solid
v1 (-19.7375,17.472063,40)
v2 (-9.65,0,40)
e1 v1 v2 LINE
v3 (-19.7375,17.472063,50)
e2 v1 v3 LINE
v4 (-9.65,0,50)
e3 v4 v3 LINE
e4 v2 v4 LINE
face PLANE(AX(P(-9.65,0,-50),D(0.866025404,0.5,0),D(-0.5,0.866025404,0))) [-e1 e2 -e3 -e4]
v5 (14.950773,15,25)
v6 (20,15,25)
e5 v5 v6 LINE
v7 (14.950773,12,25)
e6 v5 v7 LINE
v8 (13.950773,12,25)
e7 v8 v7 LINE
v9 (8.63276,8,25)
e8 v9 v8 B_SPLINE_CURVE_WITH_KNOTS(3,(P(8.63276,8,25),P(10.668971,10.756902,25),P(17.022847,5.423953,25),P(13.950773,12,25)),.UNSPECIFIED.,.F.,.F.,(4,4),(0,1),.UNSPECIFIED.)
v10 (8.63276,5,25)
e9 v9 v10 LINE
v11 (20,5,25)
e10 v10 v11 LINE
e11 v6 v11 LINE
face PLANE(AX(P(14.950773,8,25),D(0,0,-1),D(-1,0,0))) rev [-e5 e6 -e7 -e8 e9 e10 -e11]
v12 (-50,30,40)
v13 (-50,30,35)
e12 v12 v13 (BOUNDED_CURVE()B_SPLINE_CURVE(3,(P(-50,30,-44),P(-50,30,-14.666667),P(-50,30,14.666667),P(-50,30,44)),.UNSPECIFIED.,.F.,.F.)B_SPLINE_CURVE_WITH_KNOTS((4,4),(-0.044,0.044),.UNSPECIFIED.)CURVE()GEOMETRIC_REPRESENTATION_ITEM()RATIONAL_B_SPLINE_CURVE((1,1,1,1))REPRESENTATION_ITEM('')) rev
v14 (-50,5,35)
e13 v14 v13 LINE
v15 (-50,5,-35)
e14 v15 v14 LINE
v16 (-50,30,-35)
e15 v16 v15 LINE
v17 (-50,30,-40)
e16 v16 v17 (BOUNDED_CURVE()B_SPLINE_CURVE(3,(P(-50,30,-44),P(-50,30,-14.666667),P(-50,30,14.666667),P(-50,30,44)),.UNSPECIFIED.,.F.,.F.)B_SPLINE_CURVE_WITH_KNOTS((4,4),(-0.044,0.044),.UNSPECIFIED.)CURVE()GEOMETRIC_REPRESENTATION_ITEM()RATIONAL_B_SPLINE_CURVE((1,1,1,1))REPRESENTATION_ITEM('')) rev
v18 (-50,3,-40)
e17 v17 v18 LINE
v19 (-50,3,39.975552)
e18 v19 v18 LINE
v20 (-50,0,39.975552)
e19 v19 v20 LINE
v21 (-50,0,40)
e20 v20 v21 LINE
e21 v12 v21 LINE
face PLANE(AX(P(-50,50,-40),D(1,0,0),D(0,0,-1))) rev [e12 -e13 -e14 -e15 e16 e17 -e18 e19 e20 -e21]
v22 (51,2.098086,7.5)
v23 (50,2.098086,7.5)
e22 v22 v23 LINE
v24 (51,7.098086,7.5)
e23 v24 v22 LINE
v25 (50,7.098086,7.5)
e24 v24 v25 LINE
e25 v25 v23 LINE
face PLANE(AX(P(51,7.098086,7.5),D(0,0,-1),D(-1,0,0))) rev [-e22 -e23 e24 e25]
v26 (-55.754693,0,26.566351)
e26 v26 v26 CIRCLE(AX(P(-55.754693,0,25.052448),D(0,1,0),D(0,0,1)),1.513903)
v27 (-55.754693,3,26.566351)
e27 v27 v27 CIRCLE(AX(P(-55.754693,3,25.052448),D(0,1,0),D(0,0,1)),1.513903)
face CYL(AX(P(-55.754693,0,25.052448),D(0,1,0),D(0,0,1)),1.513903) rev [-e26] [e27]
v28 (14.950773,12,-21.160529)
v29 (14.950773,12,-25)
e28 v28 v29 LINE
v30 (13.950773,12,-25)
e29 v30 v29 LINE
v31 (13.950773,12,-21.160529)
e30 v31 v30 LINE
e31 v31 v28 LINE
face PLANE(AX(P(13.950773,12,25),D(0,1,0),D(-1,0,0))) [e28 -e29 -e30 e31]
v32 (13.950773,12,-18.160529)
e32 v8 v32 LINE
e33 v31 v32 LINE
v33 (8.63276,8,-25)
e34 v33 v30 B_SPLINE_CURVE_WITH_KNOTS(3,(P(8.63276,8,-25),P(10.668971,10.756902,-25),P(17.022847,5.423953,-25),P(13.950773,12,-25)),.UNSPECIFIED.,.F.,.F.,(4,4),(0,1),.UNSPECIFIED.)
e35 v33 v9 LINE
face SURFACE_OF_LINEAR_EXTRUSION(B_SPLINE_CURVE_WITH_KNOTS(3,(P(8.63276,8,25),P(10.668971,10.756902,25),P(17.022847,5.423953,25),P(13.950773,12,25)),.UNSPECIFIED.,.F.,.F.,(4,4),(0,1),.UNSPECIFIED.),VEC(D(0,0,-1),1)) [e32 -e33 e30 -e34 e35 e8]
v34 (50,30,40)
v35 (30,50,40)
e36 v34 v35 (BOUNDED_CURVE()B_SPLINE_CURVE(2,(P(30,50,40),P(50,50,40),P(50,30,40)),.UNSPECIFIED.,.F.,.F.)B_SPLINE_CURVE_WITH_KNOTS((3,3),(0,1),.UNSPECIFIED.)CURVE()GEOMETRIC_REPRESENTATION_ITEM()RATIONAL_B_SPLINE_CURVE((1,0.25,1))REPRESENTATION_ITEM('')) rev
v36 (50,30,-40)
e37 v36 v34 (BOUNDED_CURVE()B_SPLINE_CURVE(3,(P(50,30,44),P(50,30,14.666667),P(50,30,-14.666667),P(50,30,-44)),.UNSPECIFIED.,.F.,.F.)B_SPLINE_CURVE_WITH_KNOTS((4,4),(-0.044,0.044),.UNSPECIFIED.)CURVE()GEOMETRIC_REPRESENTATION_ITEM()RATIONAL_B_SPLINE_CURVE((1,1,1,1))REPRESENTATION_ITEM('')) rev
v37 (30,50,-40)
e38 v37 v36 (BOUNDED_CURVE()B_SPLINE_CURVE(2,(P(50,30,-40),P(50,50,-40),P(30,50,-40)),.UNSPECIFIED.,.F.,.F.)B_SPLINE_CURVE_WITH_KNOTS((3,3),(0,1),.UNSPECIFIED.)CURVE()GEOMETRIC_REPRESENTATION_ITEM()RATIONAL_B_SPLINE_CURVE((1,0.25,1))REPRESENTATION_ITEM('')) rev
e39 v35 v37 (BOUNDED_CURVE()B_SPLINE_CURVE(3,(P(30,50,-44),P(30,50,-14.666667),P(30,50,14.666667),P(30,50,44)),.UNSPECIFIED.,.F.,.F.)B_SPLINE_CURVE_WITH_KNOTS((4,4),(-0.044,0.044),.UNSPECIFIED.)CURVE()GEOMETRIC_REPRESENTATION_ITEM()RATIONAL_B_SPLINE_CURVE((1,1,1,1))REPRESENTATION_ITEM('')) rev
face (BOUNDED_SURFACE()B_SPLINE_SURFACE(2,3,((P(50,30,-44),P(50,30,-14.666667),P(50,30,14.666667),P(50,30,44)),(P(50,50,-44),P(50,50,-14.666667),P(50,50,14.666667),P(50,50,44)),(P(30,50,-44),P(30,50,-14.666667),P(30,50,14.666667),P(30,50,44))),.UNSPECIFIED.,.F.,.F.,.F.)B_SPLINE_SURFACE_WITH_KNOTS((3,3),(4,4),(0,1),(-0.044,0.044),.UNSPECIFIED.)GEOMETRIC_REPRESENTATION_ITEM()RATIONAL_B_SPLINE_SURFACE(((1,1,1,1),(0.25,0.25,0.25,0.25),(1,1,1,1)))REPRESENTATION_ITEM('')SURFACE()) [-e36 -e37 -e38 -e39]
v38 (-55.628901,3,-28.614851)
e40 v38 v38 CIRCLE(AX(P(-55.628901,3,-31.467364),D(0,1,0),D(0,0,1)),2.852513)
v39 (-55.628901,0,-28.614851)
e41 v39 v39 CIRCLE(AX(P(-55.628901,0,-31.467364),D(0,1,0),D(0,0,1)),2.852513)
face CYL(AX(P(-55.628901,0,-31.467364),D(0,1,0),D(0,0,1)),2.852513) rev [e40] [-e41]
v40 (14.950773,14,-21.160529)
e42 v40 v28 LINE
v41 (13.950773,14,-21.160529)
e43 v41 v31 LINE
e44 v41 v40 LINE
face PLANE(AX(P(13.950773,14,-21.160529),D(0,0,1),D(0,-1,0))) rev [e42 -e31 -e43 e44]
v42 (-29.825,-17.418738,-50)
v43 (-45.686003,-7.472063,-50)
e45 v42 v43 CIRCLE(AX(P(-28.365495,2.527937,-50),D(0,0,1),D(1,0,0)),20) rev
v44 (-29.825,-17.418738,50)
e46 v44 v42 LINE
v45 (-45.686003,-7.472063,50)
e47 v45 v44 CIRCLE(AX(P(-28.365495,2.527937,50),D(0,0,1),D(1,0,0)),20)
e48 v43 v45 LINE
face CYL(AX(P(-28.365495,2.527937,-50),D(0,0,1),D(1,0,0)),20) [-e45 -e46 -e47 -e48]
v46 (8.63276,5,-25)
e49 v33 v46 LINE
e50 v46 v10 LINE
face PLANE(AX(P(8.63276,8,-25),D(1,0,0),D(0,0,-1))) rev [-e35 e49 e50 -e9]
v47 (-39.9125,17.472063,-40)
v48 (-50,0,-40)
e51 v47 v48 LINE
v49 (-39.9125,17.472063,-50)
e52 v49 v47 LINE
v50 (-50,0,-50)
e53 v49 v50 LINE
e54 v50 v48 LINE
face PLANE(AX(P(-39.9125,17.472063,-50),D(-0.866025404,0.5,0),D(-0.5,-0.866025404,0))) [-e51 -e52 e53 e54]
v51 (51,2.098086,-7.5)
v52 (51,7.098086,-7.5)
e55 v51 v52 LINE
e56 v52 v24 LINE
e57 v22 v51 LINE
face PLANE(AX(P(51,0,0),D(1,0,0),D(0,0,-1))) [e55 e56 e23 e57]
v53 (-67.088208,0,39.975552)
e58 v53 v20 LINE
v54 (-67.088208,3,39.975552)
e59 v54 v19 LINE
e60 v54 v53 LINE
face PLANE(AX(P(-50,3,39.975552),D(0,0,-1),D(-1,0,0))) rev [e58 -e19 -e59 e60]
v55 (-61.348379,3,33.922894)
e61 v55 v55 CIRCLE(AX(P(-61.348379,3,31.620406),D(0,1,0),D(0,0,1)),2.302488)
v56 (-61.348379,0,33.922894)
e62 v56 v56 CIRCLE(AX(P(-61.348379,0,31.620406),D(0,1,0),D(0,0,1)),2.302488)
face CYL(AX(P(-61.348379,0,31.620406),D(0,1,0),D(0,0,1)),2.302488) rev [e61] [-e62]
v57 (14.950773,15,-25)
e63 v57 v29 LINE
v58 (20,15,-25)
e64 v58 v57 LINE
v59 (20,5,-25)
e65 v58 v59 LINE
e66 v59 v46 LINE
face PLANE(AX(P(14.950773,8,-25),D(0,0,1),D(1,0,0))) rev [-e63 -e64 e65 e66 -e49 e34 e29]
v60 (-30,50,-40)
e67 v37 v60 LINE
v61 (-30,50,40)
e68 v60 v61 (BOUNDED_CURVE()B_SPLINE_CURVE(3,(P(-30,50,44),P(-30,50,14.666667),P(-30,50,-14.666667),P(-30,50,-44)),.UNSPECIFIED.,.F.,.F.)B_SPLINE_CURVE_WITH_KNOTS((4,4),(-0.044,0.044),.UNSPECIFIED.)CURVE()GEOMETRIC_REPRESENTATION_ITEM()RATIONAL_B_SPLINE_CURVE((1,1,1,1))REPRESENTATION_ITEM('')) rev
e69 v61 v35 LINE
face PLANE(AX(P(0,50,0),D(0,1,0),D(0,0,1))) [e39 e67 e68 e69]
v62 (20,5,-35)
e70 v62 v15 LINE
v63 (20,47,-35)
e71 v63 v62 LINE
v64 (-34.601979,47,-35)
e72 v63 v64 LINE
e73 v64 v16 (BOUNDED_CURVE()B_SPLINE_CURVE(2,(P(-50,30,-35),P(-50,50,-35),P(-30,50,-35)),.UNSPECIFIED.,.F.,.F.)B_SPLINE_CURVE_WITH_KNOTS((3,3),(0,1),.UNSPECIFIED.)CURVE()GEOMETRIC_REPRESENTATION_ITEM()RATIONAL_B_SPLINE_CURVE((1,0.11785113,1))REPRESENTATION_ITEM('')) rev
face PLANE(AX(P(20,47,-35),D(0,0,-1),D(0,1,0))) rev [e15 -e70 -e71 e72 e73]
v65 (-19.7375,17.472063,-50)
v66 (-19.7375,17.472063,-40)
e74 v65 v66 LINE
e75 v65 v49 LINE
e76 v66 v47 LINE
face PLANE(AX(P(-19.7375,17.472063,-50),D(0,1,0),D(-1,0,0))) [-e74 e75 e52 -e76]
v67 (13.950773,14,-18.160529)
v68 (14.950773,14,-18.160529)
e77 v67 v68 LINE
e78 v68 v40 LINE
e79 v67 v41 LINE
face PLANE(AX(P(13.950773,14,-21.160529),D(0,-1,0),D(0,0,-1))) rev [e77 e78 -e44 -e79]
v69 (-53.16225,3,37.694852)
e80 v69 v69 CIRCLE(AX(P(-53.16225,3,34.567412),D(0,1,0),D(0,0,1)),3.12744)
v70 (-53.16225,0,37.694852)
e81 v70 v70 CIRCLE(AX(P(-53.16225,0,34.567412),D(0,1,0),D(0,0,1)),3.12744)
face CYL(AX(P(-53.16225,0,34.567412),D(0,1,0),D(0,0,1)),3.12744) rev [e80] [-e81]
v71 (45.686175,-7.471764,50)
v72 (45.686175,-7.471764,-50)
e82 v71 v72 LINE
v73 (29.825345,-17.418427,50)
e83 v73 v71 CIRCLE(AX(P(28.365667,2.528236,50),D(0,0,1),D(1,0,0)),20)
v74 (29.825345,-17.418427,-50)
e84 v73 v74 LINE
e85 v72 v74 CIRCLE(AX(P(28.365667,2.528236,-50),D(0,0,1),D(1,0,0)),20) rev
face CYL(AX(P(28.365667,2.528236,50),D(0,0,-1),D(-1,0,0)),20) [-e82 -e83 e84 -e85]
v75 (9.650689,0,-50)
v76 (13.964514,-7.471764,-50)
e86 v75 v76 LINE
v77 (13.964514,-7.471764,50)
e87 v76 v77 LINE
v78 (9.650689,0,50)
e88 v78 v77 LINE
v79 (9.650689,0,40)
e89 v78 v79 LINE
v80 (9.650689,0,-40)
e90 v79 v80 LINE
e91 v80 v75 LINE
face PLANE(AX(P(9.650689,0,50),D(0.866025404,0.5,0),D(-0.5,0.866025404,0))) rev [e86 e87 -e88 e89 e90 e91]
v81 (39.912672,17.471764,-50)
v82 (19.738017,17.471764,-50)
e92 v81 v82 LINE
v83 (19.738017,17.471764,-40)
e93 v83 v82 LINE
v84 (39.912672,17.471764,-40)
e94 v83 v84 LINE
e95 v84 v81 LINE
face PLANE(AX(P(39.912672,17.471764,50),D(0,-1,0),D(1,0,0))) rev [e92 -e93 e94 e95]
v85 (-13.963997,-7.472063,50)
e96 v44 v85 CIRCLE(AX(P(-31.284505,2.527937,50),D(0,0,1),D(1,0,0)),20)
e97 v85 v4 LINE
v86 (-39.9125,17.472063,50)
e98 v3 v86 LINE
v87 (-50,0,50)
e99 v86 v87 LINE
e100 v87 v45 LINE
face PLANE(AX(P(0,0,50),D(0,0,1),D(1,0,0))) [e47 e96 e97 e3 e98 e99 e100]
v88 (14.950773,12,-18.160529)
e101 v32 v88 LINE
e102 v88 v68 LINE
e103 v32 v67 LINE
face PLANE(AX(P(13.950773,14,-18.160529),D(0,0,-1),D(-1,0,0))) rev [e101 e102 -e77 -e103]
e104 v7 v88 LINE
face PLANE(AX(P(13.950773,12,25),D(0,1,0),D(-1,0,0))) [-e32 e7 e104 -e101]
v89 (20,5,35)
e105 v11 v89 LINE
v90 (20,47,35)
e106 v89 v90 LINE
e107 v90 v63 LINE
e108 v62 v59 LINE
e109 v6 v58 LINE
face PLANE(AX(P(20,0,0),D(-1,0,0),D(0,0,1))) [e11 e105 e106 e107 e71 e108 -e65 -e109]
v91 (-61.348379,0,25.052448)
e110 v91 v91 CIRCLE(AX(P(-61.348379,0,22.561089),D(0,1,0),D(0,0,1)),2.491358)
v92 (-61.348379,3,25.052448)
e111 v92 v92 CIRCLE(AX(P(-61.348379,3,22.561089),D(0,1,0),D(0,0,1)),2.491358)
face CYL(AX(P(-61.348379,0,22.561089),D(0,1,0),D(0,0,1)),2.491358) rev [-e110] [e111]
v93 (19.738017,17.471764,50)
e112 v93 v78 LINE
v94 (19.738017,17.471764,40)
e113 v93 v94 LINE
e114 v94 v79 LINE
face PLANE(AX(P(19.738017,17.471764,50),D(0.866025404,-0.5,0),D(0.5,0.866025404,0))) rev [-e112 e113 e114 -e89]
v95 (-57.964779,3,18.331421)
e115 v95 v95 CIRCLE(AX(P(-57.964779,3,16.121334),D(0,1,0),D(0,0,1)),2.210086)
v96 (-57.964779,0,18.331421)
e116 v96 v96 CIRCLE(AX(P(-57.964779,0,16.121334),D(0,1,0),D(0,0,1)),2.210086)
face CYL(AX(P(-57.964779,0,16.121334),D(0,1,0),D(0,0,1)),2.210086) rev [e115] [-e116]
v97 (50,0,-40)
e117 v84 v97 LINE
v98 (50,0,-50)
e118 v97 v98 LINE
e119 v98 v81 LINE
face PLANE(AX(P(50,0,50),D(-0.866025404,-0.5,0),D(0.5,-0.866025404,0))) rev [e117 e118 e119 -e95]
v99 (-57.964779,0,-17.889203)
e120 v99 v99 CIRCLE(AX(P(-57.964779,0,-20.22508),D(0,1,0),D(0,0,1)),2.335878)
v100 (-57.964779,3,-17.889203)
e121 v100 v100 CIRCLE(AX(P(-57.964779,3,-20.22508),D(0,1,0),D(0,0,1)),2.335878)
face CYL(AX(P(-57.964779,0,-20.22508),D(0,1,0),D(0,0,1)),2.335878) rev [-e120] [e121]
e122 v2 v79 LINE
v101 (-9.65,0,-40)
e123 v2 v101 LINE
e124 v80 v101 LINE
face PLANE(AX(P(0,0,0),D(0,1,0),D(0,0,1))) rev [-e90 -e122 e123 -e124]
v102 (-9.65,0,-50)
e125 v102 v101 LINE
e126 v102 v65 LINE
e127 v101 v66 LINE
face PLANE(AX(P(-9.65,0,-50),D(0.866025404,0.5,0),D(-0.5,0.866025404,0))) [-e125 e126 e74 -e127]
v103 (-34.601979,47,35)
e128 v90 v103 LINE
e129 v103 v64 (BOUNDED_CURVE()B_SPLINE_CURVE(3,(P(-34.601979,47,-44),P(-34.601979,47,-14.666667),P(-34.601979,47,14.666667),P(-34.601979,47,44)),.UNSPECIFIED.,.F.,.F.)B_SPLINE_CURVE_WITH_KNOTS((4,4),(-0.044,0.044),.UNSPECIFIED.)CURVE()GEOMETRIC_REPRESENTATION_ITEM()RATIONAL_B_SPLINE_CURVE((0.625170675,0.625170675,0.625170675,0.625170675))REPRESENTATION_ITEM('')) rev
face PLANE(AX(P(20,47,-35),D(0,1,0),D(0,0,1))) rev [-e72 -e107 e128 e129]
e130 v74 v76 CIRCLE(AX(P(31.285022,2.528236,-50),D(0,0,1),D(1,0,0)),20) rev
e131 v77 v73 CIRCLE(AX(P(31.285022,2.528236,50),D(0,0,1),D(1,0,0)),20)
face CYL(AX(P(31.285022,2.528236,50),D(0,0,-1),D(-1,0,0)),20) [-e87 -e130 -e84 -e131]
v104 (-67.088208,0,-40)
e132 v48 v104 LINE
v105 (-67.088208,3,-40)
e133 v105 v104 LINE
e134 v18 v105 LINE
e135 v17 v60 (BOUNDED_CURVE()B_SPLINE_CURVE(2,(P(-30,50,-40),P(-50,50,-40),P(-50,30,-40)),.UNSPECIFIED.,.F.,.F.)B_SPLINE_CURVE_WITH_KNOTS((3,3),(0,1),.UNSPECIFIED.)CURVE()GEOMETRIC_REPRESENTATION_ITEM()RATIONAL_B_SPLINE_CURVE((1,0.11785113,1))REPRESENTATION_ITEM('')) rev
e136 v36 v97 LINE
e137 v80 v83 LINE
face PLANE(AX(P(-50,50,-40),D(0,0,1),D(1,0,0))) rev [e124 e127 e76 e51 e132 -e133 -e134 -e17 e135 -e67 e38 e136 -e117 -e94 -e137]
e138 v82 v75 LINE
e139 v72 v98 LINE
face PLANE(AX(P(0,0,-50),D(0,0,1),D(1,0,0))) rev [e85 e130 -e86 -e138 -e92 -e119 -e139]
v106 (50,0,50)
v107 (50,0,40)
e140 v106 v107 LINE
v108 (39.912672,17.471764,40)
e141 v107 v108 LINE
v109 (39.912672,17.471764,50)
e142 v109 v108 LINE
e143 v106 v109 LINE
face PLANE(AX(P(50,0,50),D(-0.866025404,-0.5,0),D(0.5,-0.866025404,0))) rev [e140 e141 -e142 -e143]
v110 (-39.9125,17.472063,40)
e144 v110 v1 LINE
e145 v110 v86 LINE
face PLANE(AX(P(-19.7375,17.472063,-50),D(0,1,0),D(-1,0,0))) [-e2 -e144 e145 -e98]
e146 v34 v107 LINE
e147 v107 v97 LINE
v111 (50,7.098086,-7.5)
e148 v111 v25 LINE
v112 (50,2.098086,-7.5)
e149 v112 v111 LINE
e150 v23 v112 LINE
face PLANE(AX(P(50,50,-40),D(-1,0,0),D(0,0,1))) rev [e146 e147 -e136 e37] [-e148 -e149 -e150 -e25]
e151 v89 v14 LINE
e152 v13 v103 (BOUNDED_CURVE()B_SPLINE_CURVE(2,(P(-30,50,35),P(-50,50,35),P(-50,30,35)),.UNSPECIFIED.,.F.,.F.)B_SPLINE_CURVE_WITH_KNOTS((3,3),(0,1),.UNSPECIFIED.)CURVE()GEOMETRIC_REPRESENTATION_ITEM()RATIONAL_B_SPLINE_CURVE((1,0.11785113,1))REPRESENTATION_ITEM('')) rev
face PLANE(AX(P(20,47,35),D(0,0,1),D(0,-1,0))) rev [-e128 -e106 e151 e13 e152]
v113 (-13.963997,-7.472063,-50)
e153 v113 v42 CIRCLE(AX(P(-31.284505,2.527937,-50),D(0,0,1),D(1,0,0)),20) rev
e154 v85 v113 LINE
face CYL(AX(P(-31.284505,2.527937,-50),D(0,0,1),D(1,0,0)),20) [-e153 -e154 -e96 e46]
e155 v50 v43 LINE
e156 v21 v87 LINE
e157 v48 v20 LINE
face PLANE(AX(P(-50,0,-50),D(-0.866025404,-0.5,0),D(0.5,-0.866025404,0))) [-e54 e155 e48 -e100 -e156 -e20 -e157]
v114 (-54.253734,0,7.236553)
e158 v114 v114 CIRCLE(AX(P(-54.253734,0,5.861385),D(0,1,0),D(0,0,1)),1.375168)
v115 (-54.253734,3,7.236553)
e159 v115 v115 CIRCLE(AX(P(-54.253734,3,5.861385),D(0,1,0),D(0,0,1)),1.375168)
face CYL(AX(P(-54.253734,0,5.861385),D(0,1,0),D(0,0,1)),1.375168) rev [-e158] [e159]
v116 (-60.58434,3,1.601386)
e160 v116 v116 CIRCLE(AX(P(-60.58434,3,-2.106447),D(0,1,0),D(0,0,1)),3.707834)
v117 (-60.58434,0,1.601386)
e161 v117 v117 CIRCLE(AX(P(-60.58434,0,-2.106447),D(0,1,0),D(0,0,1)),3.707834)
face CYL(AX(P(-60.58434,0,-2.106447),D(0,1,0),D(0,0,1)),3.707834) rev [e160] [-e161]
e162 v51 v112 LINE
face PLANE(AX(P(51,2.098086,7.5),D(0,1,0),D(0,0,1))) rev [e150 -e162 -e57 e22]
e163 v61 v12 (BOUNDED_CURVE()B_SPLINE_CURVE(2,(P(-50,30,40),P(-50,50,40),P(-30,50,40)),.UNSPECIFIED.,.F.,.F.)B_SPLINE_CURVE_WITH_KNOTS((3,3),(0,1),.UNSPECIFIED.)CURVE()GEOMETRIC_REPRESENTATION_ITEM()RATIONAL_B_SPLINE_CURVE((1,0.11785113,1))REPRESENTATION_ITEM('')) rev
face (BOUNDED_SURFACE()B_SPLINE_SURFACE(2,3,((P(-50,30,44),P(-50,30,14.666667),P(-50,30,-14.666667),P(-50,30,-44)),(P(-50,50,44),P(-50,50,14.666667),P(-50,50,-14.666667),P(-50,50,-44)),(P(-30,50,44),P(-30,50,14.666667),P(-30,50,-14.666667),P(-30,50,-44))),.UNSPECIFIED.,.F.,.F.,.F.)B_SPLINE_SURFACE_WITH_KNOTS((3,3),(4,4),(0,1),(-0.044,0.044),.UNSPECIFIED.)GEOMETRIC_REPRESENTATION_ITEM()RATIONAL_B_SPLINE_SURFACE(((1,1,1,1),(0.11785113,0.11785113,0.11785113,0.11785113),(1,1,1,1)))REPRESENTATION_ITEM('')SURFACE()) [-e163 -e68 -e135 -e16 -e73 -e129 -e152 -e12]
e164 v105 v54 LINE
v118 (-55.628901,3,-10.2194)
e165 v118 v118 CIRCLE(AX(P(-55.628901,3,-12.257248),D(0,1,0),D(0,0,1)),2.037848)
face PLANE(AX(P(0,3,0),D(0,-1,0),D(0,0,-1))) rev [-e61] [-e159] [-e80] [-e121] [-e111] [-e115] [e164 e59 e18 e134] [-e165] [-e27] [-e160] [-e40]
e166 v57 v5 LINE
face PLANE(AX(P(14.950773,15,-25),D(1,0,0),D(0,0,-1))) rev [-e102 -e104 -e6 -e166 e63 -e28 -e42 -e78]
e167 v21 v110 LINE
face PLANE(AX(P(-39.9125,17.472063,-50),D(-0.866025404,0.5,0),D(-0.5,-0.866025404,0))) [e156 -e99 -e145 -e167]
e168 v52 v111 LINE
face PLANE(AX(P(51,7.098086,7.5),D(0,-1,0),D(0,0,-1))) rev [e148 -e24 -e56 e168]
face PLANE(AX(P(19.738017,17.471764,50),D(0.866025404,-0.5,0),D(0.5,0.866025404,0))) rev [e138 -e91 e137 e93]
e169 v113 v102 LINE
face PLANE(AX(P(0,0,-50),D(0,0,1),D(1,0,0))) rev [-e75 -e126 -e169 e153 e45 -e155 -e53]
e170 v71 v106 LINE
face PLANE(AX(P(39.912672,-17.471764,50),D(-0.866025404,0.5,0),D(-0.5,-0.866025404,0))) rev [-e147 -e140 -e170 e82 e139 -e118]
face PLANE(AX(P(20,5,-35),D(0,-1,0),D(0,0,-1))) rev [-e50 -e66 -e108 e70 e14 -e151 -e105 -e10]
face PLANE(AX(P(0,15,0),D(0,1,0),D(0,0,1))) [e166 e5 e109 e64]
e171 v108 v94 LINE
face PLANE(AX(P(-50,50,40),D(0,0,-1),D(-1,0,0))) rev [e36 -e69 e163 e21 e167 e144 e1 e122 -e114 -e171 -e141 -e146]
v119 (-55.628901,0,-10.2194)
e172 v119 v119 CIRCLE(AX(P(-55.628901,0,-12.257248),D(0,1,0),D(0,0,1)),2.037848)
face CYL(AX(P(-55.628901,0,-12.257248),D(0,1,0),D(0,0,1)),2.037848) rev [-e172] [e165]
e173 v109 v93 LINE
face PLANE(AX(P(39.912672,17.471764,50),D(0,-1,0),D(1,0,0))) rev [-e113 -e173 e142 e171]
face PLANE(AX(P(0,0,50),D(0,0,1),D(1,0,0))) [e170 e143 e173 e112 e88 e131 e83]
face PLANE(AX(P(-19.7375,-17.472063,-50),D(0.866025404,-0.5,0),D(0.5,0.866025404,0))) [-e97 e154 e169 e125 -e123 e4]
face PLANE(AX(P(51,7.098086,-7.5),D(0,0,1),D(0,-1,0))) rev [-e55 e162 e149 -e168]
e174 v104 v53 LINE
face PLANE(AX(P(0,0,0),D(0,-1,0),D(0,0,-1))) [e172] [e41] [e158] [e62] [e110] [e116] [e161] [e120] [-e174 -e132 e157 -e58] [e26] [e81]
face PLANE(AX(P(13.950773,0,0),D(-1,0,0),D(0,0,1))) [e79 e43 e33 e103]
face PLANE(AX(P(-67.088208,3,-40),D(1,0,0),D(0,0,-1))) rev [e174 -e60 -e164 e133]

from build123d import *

# Parameters (mm, degrees)
SKETCH_1_W           = 100
SKETCH_1_H           = 80
EXTRUDE_1_DEPTH      = 50
EXTRUDE_3_DEPTH      = 10
EXTRUDE_3_DEPTH_BACK = 90
FILLET_1_SIZE        = 20
FILLET_2_R           = 20
SKETCH_7_W           = 15
SKETCH_7_H           = 5
EXTRUDE_4_DEPTH      = 1
EXTRUDE_5_DEPTH      = 10
EXTRUDE_5_DEPTH_BACK = 90
SKETCH_9_W           = 70
SKETCH_9_H           = 42
CUT_EXTRUDE_1_DEPTH  = 70
SKETCH_10_W          = 6.318012245
SKETCH_10_H          = 50
EXTRUDE_6_DEPTH      = 3
SKETCH_11_W          = 5.049227312
SKETCH_11_H          = 50
EXTRUDE_7_DEPTH      = 10
SKETCH_12_W          = 3
SKETCH_12_H          = 2
EXTRUDE_8_DEPTH      = 1
SKETCH_14_W          = 17.088208375
SKETCH_14_H          = 79.975552451
EXTRUDE_9_DEPTH      = 3
SKETCH_15_R          = 3.127439505
SKETCH_15_R_2        = 2.491358357
SKETCH_15_R_3        = 2.210086479
SKETCH_15_R_4        = 1.513903484
SKETCH_15_R_5        = 2.302487837
SKETCH_15_R_6        = 3.707833668
SKETCH_15_R_7        = 2.33587758
SKETCH_15_R_8        = 2.037847665
SKETCH_15_R_9        = 1.375167725
SKETCH_15_R_10       = 2.852513386
CUT_EXTRUDE_2_DEPTH  = 3
FILLET_7_SIZE        = 20
FILLET_8_R           = 20
EXTRUDE_10_DEPTH     = 50


with BuildPart() as part:
    # 草圖1 → 填料-伸長1 (new body)
    with BuildSketch(Plane(origin=(0, 0, 0), x_dir=(1, 0, 0), z_dir=(0, 1, 0))):
        Rectangle(SKETCH_1_W, SKETCH_1_H)
    extrude(amount=EXTRUDE_1_DEPTH)

    # 草圖4 → 填料-伸長3 (add, two sides: drawn at the far end of the back side and taken through both)
    with BuildSketch(Plane.XY.offset(40).offset(-EXTRUDE_3_DEPTH_BACK)):
        Polygon((50, 0), (39.912672295, 17.471764098), (19.738016884, 17.471764098), (9.650689179, 0), (19.738016884, -17.471764098), (39.912672295, -17.471764098), align=None)
    extrude(amount=EXTRUDE_3_DEPTH + EXTRUDE_3_DEPTH_BACK)

    # 圓角1
    # a fillet whose section is not a circle: 20 mm, written as the material it takes off along each edge
    with BuildSketch(Plane(origin=(50, 50, -90), x_dir=(0, -1, 0), z_dir=(0, 0, 1))) as fillet_1_piece_1:
        with BuildLine():
            Bezier((FILLET_1_SIZE, 0), (0, 0), (0, -FILLET_1_SIZE), weights=[1, 0.25, 1])
            Line((0, -FILLET_1_SIZE), (0, 0))
            Line((0, 0), (FILLET_1_SIZE, 0))
        make_face()
    extrude(amount=180, mode=Mode.SUBTRACT)

    # 圓角2
    # the kernel refuses this fillet: 20 mm, written as the material it takes off along each edge
    with BuildSketch(Plane(origin=(39.912672295, -17.471764098, 78.867513459), x_dir=(0.499999999999995, 0.8660254037844415, 0), z_dir=(0, 0, -1))) as fillet_2_piece_1:
        with BuildLine():
            CenterArc((FILLET_2_R * 0.57735026919, -FILLET_2_R), FILLET_2_R, 90, 60)
            Line((-FILLET_2_R * 0.288675134595, -FILLET_2_R * 0.5), (0, 0))
            Line((0, 0), (FILLET_2_R * 0.57735026919, 0))
        make_face()
    extrude(amount=157.735026919, mode=Mode.SUBTRACT)
    with BuildSketch(Plane(origin=(19.738016884, -17.471764098, 78.867513459), x_dir=(-0.5000000000000067, 0.8660254037844347, 0), z_dir=(0, 0, -1))) as fillet_2_piece_2:
        with BuildLine():
            CenterArc((FILLET_2_R * 0.57735026919, FILLET_2_R), FILLET_2_R, 210, 60)
            Line((-FILLET_2_R * 0.288675134595, FILLET_2_R * 0.5), (0, 0))
            Line((0, 0), (FILLET_2_R * 0.57735026919, 0))
        make_face()
    extrude(amount=157.735026919, mode=Mode.SUBTRACT)

    # 草圖7 → 填料-伸長4 (add)
    with BuildSketch(Plane(origin=(50, 0, 0), x_dir=(0, 0, -1), z_dir=(1, 0, 0))):
        with Locations((0, 4.59808643)):
            Rectangle(SKETCH_7_W, SKETCH_7_H)
    extrude(amount=EXTRUDE_4_DEPTH)

    # 草圖8 → 填料-伸長5 (add, two sides: drawn at the far end of the back side and taken through both)
    with BuildSketch(Plane.XY.offset(40).offset(-EXTRUDE_5_DEPTH_BACK)):
        Polygon((-9.65, 0), (-19.7375, 17.472062521), (-39.9125, 17.472062521), (-50, 0), (-39.9125, -17.472062521), (-19.7375, -17.472062521), align=None)
    extrude(amount=EXTRUDE_5_DEPTH + EXTRUDE_5_DEPTH_BACK)

    # 草圖9 → 除料-伸長1 (cut)
    with BuildSketch(Plane.ZY.offset(50)):
        with Locations((0, 26)):
            Rectangle(SKETCH_9_W, SKETCH_9_H)
    extrude(amount=-CUT_EXTRUDE_1_DEPTH, mode=Mode.SUBTRACT)

    # 草圖10 → 填料-伸長6 (add)
    with BuildSketch(Plane(origin=(0, 5, 0), x_dir=(1, 0, 0), z_dir=(0, 1, 0))):
        with Locations((11.791766566, 0)):
            Rectangle(SKETCH_10_W, SKETCH_10_H)
    extrude(amount=EXTRUDE_6_DEPTH)

    # 草圖11 → 填料-伸長7 (add)
    with BuildSketch(Plane(origin=(0, 5, 0), x_dir=(1, 0, 0), z_dir=(0, 1, 0))):
        with Locations((17.475386344, 0)):
            Rectangle(SKETCH_11_W, SKETCH_11_H)
    extrude(amount=EXTRUDE_7_DEPTH)

    # 草圖12 → 填料-伸長8 (add)
    with BuildSketch(Plane.ZY.offset(-14.950772688)):
        with Locations((-19.660528626, 13)):
            Rectangle(SKETCH_12_W, SKETCH_12_H)
    extrude(amount=EXTRUDE_8_DEPTH)

    # 草圖14 → 填料-伸長9 (add)
    with BuildSketch(Plane(origin=(0, 0, 0), x_dir=(1, 0, 0), z_dir=(0, 1, 0))):
        with Locations((-58.544104188, 0.012223774)):
            Rectangle(SKETCH_14_W, SKETCH_14_H)
    extrude(amount=EXTRUDE_9_DEPTH)

    # 草圖15 → 除料-伸長2 (cut)
    with BuildSketch(Plane(origin=(0, 3, 0), x_dir=(1, 0, 0), z_dir=(0, 1, 0))):
        with Locations(Location((-53.162249787, -34.567412257, 0), (0, 0, 270))):
            Circle(SKETCH_15_R)
        with Locations(Location((-61.348379135, -22.561089213, 0), (0, 0, 270))):
            Circle(SKETCH_15_R_2)
        with Locations(Location((-57.964779004, -16.121334126, 0), (0, 0, 270))):
            Circle(SKETCH_15_R_3)
        with Locations(Location((-55.754692526, -25.052447569, 0), (0, 0, 270))):
            Circle(SKETCH_15_R_4)
        with Locations(Location((-61.348379135, -31.620405692, 0), (0, 0, 270))):
            Circle(SKETCH_15_R_5)
        with Locations(Location((-60.584340396, 2.106447223, 0), (0, 0, 270))):
            Circle(SKETCH_15_R_6)
        with Locations(Location((-57.964779004, 20.225080181, 0), (0, 0, 270))):
            Circle(SKETCH_15_R_7)
        with Locations(Location((-55.628901425, 12.257247615, 0), (0, 0, 270))):
            Circle(SKETCH_15_R_8)
        with Locations(Location((-54.2537337, -5.861385342, 0), (0, 0, 270))):
            Circle(SKETCH_15_R_9)
        with Locations(Location((-55.628901425, 31.467364486, 0), (0, 0, 270))):
            Circle(SKETCH_15_R_10)
    extrude(amount=-CUT_EXTRUDE_2_DEPTH, mode=Mode.SUBTRACT)

    # 圓角7
    # a fillet whose section is not a circle: 20 mm, written as the material it takes off along each edge
    with BuildSketch(Plane(origin=(-50, 50, 90), x_dir=(0, -1, 0), z_dir=(0, 0, -1))) as fillet_7_piece_1:
        with BuildLine():
            Bezier((FILLET_7_SIZE, 0), (0, 0), (0, -FILLET_7_SIZE), weights=[1, 0.11785113, 1])
            Line((0, -FILLET_7_SIZE), (0, 0))
            Line((0, 0), (FILLET_7_SIZE, 0))
        make_face()
    extrude(amount=180, mode=Mode.SUBTRACT)

    # 圓角8
    # the kernel refuses this fillet: 20 mm, written as the material it takes off along each edge
    with BuildSketch(Plane(origin=(-19.7375, -17.472062521, 78.867513459), x_dir=(0.4999999999999952, 0.8660254037844414, 0), z_dir=(0, 0, -1))) as fillet_8_piece_1:
        with BuildLine():
            CenterArc((FILLET_8_R * 0.57735026919, -FILLET_8_R), FILLET_8_R, 90, 60)
            Line((-FILLET_8_R * 0.288675134595, -FILLET_8_R * 0.5), (0, 0))
            Line((0, 0), (FILLET_8_R * 0.57735026919, 0))
        make_face()
    extrude(amount=157.735026919, mode=Mode.SUBTRACT)
    with BuildSketch(Plane(origin=(-39.9125, -17.472062521, 78.867513459), x_dir=(-0.5000000000000036, 0.8660254037844366, 0), z_dir=(0, 0, -1))) as fillet_8_piece_2:
        with BuildLine():
            CenterArc((FILLET_8_R * 0.57735026919, FILLET_8_R), FILLET_8_R, 210, 60)
            Line((-FILLET_8_R * 0.288675134595, FILLET_8_R * 0.5), (0, 0))
            Line((0, 0), (FILLET_8_R * 0.57735026919, 0))
        make_face()
    extrude(amount=157.735026919, mode=Mode.SUBTRACT)

    # 草圖18 → 填料-伸長10 (add)
    with BuildSketch(Plane(origin=(0, 0, -25), x_dir=(-1, 0, 0), z_dir=(0, 0, -1))):
        with BuildLine():
            Line((-13.950772688, 12), (-14.950772688, 12))
            Line((-14.950772688, 12), (-14.950772688, 8))
            Line((-14.950772688, 8), (-8.632760443, 8))
            add(Edge.make_bspline(
                [(-13.950772688, 12), (-17.022847393, 5.423952997), (-10.668970585, 10.756901706), (-8.632760443, 8)],
                knots=[0, 0, 0, 0, 1, 1, 1, 1], degree=3))
        make_face()
    extrude(amount=-EXTRUDE_10_DEPTH)


solid = part.part
